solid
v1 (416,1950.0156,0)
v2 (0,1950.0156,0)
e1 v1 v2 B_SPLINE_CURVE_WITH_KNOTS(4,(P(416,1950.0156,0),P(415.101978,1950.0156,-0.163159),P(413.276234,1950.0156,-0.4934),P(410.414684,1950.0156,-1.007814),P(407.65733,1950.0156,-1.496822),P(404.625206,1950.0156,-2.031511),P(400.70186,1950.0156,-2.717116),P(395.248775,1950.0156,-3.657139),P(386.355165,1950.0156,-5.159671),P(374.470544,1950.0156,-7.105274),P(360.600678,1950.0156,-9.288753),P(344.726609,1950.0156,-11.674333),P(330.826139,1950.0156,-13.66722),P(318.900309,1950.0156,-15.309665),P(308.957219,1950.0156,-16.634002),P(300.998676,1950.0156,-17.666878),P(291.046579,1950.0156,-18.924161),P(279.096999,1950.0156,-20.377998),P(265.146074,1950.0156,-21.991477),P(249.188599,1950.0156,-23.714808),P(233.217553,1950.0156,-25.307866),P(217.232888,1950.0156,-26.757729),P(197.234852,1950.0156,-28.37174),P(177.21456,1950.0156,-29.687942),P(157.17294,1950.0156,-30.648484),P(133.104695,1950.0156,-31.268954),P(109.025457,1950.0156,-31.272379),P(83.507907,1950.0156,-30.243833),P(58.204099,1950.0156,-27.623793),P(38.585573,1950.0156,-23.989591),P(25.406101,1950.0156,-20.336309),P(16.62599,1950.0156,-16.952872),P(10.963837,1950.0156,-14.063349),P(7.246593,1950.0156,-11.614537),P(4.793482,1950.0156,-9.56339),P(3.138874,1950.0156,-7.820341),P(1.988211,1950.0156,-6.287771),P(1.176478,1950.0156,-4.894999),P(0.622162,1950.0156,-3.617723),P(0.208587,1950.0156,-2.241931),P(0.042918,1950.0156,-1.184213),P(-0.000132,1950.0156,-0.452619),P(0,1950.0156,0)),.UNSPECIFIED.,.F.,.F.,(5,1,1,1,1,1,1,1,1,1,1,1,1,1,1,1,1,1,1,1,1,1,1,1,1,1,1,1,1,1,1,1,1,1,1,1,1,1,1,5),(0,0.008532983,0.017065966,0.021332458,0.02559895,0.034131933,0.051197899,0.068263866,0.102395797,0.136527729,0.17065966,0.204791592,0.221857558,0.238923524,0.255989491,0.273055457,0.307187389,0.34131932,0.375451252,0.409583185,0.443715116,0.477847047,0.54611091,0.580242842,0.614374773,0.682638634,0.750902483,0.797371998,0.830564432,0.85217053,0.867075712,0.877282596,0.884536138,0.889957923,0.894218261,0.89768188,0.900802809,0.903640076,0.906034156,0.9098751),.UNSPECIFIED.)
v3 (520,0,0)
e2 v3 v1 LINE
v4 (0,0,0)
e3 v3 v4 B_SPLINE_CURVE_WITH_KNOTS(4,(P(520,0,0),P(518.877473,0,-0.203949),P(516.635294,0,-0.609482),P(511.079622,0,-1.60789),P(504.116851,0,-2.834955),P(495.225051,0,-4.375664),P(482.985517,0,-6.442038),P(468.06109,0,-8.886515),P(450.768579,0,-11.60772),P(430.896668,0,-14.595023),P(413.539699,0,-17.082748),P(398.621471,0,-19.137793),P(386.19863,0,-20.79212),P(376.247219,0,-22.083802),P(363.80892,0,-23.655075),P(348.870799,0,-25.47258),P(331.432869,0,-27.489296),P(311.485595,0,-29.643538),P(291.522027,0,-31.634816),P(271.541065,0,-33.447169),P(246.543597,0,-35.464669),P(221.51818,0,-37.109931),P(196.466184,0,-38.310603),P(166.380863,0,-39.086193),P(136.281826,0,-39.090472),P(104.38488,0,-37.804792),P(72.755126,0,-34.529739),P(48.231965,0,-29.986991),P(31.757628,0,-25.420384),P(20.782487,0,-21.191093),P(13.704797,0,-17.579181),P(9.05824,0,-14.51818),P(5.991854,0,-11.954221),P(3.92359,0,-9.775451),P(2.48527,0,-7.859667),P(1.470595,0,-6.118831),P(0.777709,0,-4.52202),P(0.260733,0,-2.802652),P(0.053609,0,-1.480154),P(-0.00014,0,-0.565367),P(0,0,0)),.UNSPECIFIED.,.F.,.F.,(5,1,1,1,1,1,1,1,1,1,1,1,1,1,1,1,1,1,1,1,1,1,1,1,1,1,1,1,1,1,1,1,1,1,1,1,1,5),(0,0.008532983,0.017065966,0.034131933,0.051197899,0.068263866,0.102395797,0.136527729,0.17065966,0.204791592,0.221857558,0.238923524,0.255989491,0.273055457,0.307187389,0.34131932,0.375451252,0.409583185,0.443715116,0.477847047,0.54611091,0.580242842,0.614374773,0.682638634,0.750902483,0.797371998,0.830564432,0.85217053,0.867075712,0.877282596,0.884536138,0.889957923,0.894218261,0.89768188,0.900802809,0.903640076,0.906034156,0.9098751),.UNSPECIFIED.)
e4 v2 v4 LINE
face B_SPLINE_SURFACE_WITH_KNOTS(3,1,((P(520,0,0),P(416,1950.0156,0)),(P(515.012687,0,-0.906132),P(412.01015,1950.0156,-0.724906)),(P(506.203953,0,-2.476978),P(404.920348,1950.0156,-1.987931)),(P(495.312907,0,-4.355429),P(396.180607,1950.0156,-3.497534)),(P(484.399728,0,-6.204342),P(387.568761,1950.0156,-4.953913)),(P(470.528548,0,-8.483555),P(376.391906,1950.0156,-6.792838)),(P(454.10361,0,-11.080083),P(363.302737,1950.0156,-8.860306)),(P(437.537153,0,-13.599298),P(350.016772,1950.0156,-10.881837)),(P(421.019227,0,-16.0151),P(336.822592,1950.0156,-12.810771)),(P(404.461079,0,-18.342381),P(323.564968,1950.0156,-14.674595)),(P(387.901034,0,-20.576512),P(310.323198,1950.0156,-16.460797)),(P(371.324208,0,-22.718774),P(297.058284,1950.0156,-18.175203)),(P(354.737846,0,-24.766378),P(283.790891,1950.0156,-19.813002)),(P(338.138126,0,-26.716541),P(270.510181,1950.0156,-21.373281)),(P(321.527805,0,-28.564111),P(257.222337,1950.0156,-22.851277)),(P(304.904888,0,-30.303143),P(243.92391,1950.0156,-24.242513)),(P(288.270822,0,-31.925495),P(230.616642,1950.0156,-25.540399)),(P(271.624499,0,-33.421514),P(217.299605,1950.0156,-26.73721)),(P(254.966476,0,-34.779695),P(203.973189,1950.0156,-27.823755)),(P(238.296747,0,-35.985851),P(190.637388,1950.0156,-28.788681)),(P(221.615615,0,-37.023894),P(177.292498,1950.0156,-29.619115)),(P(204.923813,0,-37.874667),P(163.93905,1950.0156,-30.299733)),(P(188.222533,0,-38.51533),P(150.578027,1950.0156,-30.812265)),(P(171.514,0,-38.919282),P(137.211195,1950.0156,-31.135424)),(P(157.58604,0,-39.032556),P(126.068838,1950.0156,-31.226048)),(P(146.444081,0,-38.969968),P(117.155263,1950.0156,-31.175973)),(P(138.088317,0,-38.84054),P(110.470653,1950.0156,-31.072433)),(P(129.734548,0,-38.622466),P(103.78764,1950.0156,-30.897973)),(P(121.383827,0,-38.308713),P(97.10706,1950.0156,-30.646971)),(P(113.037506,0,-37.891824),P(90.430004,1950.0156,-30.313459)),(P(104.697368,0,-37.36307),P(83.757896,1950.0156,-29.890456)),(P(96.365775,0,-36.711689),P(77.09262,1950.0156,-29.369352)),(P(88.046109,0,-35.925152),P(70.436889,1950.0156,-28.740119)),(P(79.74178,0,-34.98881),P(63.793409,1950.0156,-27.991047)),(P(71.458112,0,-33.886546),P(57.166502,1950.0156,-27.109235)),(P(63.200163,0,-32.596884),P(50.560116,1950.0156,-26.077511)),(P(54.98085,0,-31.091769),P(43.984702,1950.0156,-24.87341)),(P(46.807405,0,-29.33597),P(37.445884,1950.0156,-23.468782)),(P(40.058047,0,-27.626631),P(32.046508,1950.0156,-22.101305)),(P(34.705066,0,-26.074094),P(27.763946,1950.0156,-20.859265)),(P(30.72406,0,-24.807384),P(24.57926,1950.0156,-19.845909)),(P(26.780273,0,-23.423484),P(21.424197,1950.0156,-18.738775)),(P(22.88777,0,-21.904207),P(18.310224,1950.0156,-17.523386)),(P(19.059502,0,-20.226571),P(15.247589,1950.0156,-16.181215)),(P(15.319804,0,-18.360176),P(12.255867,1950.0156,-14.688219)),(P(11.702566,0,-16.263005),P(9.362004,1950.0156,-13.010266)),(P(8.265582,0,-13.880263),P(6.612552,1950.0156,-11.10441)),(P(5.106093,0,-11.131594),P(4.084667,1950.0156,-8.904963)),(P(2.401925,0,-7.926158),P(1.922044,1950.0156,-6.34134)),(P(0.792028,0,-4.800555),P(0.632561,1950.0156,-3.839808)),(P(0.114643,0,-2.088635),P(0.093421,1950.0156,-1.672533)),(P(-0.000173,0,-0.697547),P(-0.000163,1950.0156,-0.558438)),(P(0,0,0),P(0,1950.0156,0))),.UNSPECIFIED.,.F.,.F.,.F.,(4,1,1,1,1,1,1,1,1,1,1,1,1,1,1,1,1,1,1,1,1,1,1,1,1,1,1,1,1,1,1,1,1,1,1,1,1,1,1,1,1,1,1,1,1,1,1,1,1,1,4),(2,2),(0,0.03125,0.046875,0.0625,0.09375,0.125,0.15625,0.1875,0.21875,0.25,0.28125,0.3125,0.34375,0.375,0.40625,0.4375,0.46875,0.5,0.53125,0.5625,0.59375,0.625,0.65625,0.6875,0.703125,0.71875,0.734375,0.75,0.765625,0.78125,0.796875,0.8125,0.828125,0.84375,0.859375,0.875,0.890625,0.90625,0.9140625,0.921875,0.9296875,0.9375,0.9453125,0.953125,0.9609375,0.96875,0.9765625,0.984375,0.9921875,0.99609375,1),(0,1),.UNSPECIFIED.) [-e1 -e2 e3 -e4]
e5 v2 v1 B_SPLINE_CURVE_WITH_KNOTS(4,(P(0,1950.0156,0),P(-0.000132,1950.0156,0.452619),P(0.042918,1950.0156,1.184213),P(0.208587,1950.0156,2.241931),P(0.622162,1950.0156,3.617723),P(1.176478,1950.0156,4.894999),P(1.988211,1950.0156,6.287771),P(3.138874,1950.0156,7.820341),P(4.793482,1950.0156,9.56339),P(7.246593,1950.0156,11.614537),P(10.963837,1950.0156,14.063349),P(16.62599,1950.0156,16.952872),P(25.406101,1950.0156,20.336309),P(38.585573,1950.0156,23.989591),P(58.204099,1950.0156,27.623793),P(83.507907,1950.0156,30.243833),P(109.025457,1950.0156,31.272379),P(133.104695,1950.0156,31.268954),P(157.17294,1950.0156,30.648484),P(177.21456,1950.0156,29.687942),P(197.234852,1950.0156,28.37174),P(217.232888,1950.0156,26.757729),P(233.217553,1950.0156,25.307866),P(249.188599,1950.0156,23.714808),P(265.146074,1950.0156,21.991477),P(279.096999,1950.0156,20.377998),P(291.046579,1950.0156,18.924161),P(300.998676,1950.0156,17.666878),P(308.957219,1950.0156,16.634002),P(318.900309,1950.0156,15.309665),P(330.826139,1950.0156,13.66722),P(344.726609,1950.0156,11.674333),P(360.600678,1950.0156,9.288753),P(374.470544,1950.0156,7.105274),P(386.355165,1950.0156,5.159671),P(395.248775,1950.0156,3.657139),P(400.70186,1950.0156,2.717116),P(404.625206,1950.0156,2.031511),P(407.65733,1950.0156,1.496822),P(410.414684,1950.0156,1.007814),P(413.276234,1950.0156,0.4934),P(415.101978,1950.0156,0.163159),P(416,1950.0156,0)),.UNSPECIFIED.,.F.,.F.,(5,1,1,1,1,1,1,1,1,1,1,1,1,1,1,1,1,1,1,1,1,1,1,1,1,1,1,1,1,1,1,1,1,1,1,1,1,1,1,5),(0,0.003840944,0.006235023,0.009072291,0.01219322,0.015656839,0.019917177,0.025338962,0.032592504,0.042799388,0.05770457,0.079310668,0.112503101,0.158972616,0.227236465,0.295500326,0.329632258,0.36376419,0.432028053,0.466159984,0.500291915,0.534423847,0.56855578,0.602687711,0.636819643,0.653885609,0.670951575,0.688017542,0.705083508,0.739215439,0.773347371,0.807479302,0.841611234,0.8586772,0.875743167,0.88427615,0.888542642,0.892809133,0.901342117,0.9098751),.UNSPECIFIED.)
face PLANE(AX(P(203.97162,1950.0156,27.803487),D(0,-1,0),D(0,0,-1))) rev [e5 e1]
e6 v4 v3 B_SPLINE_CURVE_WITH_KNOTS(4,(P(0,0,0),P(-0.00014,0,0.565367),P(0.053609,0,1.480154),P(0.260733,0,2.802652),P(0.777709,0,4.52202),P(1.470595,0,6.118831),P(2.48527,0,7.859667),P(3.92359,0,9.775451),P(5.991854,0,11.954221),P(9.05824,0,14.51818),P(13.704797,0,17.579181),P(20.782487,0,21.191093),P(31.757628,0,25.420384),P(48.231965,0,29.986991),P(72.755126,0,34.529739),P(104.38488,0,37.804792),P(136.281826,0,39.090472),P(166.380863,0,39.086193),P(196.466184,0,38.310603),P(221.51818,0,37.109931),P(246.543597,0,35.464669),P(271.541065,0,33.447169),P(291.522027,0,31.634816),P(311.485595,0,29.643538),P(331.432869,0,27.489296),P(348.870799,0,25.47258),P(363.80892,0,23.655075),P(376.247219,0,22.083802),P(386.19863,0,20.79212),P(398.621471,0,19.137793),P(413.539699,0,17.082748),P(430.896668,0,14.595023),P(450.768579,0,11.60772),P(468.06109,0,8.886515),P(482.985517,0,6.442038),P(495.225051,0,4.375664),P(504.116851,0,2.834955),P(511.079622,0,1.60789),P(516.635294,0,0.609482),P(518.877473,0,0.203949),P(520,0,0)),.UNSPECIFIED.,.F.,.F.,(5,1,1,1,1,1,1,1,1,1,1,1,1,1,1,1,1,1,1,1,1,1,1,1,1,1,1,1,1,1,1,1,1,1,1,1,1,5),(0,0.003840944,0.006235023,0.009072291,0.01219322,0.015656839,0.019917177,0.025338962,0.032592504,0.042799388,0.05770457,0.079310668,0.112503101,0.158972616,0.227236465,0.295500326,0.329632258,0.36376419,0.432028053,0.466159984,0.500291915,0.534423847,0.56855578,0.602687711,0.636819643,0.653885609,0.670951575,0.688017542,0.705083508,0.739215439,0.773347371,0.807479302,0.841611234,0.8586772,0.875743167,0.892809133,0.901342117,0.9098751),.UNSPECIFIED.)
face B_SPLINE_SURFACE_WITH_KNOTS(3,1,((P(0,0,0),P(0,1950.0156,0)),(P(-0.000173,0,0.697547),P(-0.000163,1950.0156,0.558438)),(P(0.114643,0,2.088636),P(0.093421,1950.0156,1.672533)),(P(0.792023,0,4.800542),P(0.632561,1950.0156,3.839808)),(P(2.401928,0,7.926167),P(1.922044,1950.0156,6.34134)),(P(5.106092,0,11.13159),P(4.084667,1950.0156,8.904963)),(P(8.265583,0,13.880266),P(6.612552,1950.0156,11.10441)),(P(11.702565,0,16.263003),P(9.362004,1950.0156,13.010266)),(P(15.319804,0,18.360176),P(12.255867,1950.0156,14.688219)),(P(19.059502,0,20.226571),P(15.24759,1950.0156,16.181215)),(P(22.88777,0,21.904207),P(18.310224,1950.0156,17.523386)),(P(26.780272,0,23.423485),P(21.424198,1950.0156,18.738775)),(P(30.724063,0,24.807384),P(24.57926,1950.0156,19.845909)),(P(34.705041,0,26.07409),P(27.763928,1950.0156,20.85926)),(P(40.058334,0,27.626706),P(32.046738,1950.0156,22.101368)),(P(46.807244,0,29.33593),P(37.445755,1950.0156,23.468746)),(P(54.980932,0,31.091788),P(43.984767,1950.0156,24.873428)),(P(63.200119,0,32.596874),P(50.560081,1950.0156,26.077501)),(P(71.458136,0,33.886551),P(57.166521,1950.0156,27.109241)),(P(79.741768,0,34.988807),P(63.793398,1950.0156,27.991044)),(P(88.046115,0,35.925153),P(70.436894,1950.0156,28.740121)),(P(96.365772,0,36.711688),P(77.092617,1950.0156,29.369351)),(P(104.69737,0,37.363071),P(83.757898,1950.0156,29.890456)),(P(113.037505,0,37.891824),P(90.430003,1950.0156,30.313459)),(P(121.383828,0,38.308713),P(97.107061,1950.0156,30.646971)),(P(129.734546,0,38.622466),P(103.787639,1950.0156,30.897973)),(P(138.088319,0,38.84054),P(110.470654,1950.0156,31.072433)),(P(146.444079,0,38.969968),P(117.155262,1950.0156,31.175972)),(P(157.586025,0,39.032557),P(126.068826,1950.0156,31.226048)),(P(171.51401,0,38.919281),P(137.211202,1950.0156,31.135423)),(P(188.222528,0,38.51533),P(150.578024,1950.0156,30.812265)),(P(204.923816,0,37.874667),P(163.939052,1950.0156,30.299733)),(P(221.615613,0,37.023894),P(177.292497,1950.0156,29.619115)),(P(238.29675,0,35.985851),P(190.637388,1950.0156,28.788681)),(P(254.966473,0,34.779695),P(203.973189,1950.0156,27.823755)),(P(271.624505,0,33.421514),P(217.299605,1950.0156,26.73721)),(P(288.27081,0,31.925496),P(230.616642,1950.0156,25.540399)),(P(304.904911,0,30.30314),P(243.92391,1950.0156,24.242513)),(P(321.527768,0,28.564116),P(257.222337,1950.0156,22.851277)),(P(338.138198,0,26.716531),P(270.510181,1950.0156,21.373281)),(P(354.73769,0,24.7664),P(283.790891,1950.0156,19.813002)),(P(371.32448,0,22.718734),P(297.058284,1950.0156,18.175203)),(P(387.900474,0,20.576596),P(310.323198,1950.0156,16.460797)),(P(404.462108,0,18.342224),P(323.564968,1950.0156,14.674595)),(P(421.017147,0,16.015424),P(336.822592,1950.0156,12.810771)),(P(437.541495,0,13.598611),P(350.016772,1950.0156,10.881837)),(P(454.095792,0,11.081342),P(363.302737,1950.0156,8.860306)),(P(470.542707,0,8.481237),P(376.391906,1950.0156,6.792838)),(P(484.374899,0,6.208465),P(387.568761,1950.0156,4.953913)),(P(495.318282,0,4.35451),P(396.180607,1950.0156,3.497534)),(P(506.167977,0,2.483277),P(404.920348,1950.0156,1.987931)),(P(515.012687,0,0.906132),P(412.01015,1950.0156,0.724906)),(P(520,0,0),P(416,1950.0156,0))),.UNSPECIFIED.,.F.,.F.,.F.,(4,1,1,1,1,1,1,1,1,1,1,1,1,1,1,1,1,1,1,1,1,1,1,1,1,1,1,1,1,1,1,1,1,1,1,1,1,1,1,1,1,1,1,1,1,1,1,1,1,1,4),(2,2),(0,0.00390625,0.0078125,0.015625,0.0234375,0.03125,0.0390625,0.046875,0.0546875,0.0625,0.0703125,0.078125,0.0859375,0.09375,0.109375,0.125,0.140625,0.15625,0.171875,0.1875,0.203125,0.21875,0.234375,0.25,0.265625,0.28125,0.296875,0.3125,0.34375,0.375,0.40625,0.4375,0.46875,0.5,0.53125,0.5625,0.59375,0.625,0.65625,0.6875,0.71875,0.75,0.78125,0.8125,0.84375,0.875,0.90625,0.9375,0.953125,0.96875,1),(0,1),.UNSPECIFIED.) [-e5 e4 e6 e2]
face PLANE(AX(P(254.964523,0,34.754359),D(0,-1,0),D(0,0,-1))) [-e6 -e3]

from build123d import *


with BuildPart() as part:
    # rootSketch → Loft1 section 0
    with BuildSketch(Plane(origin=(0, 0, 0), x_dir=(1, 0, 0), z_dir=(0, 1, 0))):
        with BuildLine():
            add(Edge.make_bspline(
                [(0, 0), (-0.000139838, 0.565367364), (0.053608575, 1.480154282), (0.260733418, 2.802652486), (0.7777085, 4.522019853), (1.470594607, 6.11883058), (2.485270254, 7.859667131), (3.923589883, 9.775450943), (5.991853866, 11.954221323), (9.058240175, 14.518179681), (13.704796903, 17.579181132), (20.782486791, 21.191093235), (31.757627552, 25.420383807), (48.231965173, 29.986990656), (72.755125566, 34.529739491), (104.384880296, 37.804792092), (136.281825909, 39.090472477), (166.380863049, 39.086193162), (196.466184383, 38.310602726), (221.518179643, 37.109931355), (246.543596824, 35.464669459), (271.541065161, 33.447169349), (291.522027005, 31.63481624), (311.485595353, 29.643537525), (331.432868604, 27.489295509), (348.870798819, 25.472579841), (363.808919599, 23.655074731), (376.247218729, 22.083801981), (386.198630465, 20.792119843), (398.621470561, 19.137792805), (413.539698814, 17.082748445), (430.896668055, 14.595022816), (450.768578608, 11.607719555), (468.061090398, 8.886514638), (482.985517469, 6.442038019), (495.22505107, 4.375664147), (504.116850561, 2.834955302), (511.079622405, 1.607890042), (516.63529399, 0.609482017), (518.877472606, 0.203949196), (520.000000005, -1e-09)],
                knots=[0, 0, 0, 0, 0, 0.003840944, 0.006235023, 0.009072291, 0.01219322, 0.015656839, 0.019917177, 0.025338962, 0.032592504, 0.042799388, 0.05770457, 0.079310668, 0.112503101, 0.158972616, 0.227236465, 0.295500326, 0.329632258, 0.36376419, 0.432028053, 0.466159984, 0.500291915, 0.534423847, 0.56855578, 0.602687711, 0.636819643, 0.653885609, 0.670951575, 0.688017542, 0.705083508, 0.739215439, 0.773347371, 0.807479302, 0.841611234, 0.8586772, 0.875743167, 0.892809133, 0.901342117, 0.9098751, 0.9098751, 0.9098751, 0.9098751, 0.9098751], degree=4))
            add(Edge.make_bspline(
                [(0, 0), (-0.000139838, -0.565367364), (0.053608575, -1.480154282), (0.260733418, -2.802652486), (0.7777085, -4.522019853), (1.470594607, -6.11883058), (2.485270254, -7.859667131), (3.923589883, -9.775450943), (5.991853866, -11.954221323), (9.058240175, -14.518179681), (13.704796903, -17.579181132), (20.782486791, -21.191093235), (31.757627552, -25.420383807), (48.231965173, -29.986990656), (72.755125566, -34.529739491), (104.384880296, -37.804792092), (136.281825909, -39.090472477), (166.380863049, -39.086193163), (196.466184383, -38.310602726), (221.518179642, -37.109931356), (246.543596824, -35.464669459), (271.541065161, -33.447169349), (291.522027005, -31.634816241), (311.485595352, -29.643537526), (331.432868604, -27.48929551), (348.870798819, -25.472579842), (363.808919599, -23.655074732), (376.247218729, -22.083801982), (386.198630465, -20.792119844), (398.621470561, -19.137792806), (413.539698814, -17.082748446), (430.896668055, -14.595022816), (450.768578608, -11.607719556), (468.061090398, -8.886514639), (482.985517469, -6.44203802), (495.22505107, -4.375664148), (504.116850561, -2.834955303), (511.079622405, -1.607890043), (516.63529399, -0.609482018), (518.877472606, -0.203949197), (520.000000005, -1e-09)],
                knots=[0, 0, 0, 0, 0, 0.003840944, 0.006235023, 0.009072291, 0.01219322, 0.015656839, 0.019917177, 0.025338962, 0.032592504, 0.042799388, 0.05770457, 0.079310668, 0.112503101, 0.158972616, 0.227236465, 0.295500326, 0.329632258, 0.36376419, 0.432028053, 0.466159984, 0.500291915, 0.534423847, 0.56855578, 0.602687711, 0.636819643, 0.653885609, 0.670951575, 0.688017542, 0.705083508, 0.739215439, 0.773347371, 0.807479302, 0.841611234, 0.8586772, 0.875743167, 0.892809133, 0.901342117, 0.9098751, 0.9098751, 0.9098751, 0.9098751, 0.9098751], degree=4))
        make_face()
    # tipSketch → Loft1 section 1
    with BuildSketch(Plane(origin=(0, 1950.0156, 0), x_dir=(1, 0, 0), z_dir=(0, 1, 0))):
        with BuildLine():
            add(Edge.make_bspline(
                [(0, 0), (-0.000132412, 0.452618906), (0.042917722, 1.184213362), (0.208586844, 2.241931202), (0.62216163, 3.617723242), (1.176477958, 4.89499944), (1.988211441, 6.287770656), (3.138873624, 7.820340546), (4.793481793, 9.56338984), (7.246593321, 11.614536597), (10.963836971, 14.063349182), (16.625990001, 16.952872004), (25.406101469, 20.33630865), (38.585572953, 23.989591422), (58.204099069, 27.623792605), (83.507906657, 30.243832662), (109.025457267, 31.27237895), (133.104694853, 31.268953565), (157.172939653, 30.648483717), (177.214559693, 29.687942101), (197.234851963, 28.371740247), (217.232887646, 26.757729), (233.217552674, 25.307865533), (249.188599079, 23.714807698), (265.146073827, 21.991476578), (279.096998981, 20.377998474), (291.046579019, 18.924160926), (300.998676342, 17.666877817), (308.957219414, 16.634002013), (318.900309088, 15.309665079), (330.826138751, 13.6672199), (344.726608953, 11.674333181), (360.600678071, 9.288752861), (374.470544112, 7.105274196), (386.355165303, 5.159671315), (395.248775092, 3.657138906), (400.701859779, 2.717115524), (404.625206159, 2.031511088), (407.657329623, 1.496822368), (410.41468416, 1.00781364), (413.276234016, 0.493399829), (415.101978082, 0.163159357), (416, 0)],
                knots=[0, 0, 0, 0, 0, 0.003840944, 0.006235023, 0.009072291, 0.01219322, 0.015656839, 0.019917177, 0.025338962, 0.032592504, 0.042799388, 0.05770457, 0.079310668, 0.112503101, 0.158972616, 0.227236465, 0.295500326, 0.329632258, 0.36376419, 0.432028053, 0.466159984, 0.500291915, 0.534423847, 0.56855578, 0.602687711, 0.636819643, 0.653885609, 0.670951575, 0.688017542, 0.705083508, 0.739215439, 0.773347371, 0.807479302, 0.841611234, 0.8586772, 0.875743167, 0.88427615, 0.888542642, 0.892809133, 0.901342117, 0.9098751, 0.9098751, 0.9098751, 0.9098751, 0.9098751], degree=4))
            add(Edge.make_bspline(
                [(0, 0), (-0.000132412, -0.452618906), (0.042917722, -1.184213362), (0.208586844, -2.241931202), (0.62216163, -3.617723242), (1.176477958, -4.89499944), (1.988211441, -6.287770656), (3.138873624, -7.820340546), (4.793481793, -9.56338984), (7.246593321, -11.614536597), (10.963836971, -14.063349182), (16.625990001, -16.952872004), (25.406101469, -20.33630865), (38.585572953, -23.989591422), (58.204099069, -27.623792605), (83.507906657, -30.243832662), (109.025457267, -31.27237895), (133.104694853, -31.268953565), (157.172939653, -30.648483717), (177.214559693, -29.687942101), (197.234851963, -28.371740247), (217.232887646, -26.757729), (233.217552674, -25.307865533), (249.188599079, -23.714807698), (265.146073827, -21.991476578), (279.096998981, -20.377998474), (291.046579019, -18.924160926), (300.998676342, -17.666877817), (308.957219414, -16.634002013), (318.900309088, -15.309665079), (330.826138751, -13.6672199), (344.726608953, -11.674333181), (360.600678071, -9.288752861), (374.470544112, -7.105274196), (386.355165303, -5.159671315), (395.248775092, -3.657138906), (400.701859779, -2.717115524), (404.625206159, -2.031511088), (407.657329623, -1.496822368), (410.41468416, -1.00781364), (413.276234016, -0.493399829), (415.101978082, -0.163159357), (416, 0)],
                knots=[0, 0, 0, 0, 0, 0.003840944, 0.006235023, 0.009072291, 0.01219322, 0.015656839, 0.019917177, 0.025338962, 0.032592504, 0.042799388, 0.05770457, 0.079310668, 0.112503101, 0.158972616, 0.227236465, 0.295500326, 0.329632258, 0.36376419, 0.432028053, 0.466159984, 0.500291915, 0.534423847, 0.56855578, 0.602687711, 0.636819643, 0.653885609, 0.670951575, 0.688017542, 0.705083508, 0.739215439, 0.773347371, 0.807479302, 0.841611234, 0.8586772, 0.875743167, 0.88427615, 0.888542642, 0.892809133, 0.901342117, 0.9098751, 0.9098751, 0.9098751, 0.9098751, 0.9098751], degree=4))
        make_face()
    loft()


solid = part.part
